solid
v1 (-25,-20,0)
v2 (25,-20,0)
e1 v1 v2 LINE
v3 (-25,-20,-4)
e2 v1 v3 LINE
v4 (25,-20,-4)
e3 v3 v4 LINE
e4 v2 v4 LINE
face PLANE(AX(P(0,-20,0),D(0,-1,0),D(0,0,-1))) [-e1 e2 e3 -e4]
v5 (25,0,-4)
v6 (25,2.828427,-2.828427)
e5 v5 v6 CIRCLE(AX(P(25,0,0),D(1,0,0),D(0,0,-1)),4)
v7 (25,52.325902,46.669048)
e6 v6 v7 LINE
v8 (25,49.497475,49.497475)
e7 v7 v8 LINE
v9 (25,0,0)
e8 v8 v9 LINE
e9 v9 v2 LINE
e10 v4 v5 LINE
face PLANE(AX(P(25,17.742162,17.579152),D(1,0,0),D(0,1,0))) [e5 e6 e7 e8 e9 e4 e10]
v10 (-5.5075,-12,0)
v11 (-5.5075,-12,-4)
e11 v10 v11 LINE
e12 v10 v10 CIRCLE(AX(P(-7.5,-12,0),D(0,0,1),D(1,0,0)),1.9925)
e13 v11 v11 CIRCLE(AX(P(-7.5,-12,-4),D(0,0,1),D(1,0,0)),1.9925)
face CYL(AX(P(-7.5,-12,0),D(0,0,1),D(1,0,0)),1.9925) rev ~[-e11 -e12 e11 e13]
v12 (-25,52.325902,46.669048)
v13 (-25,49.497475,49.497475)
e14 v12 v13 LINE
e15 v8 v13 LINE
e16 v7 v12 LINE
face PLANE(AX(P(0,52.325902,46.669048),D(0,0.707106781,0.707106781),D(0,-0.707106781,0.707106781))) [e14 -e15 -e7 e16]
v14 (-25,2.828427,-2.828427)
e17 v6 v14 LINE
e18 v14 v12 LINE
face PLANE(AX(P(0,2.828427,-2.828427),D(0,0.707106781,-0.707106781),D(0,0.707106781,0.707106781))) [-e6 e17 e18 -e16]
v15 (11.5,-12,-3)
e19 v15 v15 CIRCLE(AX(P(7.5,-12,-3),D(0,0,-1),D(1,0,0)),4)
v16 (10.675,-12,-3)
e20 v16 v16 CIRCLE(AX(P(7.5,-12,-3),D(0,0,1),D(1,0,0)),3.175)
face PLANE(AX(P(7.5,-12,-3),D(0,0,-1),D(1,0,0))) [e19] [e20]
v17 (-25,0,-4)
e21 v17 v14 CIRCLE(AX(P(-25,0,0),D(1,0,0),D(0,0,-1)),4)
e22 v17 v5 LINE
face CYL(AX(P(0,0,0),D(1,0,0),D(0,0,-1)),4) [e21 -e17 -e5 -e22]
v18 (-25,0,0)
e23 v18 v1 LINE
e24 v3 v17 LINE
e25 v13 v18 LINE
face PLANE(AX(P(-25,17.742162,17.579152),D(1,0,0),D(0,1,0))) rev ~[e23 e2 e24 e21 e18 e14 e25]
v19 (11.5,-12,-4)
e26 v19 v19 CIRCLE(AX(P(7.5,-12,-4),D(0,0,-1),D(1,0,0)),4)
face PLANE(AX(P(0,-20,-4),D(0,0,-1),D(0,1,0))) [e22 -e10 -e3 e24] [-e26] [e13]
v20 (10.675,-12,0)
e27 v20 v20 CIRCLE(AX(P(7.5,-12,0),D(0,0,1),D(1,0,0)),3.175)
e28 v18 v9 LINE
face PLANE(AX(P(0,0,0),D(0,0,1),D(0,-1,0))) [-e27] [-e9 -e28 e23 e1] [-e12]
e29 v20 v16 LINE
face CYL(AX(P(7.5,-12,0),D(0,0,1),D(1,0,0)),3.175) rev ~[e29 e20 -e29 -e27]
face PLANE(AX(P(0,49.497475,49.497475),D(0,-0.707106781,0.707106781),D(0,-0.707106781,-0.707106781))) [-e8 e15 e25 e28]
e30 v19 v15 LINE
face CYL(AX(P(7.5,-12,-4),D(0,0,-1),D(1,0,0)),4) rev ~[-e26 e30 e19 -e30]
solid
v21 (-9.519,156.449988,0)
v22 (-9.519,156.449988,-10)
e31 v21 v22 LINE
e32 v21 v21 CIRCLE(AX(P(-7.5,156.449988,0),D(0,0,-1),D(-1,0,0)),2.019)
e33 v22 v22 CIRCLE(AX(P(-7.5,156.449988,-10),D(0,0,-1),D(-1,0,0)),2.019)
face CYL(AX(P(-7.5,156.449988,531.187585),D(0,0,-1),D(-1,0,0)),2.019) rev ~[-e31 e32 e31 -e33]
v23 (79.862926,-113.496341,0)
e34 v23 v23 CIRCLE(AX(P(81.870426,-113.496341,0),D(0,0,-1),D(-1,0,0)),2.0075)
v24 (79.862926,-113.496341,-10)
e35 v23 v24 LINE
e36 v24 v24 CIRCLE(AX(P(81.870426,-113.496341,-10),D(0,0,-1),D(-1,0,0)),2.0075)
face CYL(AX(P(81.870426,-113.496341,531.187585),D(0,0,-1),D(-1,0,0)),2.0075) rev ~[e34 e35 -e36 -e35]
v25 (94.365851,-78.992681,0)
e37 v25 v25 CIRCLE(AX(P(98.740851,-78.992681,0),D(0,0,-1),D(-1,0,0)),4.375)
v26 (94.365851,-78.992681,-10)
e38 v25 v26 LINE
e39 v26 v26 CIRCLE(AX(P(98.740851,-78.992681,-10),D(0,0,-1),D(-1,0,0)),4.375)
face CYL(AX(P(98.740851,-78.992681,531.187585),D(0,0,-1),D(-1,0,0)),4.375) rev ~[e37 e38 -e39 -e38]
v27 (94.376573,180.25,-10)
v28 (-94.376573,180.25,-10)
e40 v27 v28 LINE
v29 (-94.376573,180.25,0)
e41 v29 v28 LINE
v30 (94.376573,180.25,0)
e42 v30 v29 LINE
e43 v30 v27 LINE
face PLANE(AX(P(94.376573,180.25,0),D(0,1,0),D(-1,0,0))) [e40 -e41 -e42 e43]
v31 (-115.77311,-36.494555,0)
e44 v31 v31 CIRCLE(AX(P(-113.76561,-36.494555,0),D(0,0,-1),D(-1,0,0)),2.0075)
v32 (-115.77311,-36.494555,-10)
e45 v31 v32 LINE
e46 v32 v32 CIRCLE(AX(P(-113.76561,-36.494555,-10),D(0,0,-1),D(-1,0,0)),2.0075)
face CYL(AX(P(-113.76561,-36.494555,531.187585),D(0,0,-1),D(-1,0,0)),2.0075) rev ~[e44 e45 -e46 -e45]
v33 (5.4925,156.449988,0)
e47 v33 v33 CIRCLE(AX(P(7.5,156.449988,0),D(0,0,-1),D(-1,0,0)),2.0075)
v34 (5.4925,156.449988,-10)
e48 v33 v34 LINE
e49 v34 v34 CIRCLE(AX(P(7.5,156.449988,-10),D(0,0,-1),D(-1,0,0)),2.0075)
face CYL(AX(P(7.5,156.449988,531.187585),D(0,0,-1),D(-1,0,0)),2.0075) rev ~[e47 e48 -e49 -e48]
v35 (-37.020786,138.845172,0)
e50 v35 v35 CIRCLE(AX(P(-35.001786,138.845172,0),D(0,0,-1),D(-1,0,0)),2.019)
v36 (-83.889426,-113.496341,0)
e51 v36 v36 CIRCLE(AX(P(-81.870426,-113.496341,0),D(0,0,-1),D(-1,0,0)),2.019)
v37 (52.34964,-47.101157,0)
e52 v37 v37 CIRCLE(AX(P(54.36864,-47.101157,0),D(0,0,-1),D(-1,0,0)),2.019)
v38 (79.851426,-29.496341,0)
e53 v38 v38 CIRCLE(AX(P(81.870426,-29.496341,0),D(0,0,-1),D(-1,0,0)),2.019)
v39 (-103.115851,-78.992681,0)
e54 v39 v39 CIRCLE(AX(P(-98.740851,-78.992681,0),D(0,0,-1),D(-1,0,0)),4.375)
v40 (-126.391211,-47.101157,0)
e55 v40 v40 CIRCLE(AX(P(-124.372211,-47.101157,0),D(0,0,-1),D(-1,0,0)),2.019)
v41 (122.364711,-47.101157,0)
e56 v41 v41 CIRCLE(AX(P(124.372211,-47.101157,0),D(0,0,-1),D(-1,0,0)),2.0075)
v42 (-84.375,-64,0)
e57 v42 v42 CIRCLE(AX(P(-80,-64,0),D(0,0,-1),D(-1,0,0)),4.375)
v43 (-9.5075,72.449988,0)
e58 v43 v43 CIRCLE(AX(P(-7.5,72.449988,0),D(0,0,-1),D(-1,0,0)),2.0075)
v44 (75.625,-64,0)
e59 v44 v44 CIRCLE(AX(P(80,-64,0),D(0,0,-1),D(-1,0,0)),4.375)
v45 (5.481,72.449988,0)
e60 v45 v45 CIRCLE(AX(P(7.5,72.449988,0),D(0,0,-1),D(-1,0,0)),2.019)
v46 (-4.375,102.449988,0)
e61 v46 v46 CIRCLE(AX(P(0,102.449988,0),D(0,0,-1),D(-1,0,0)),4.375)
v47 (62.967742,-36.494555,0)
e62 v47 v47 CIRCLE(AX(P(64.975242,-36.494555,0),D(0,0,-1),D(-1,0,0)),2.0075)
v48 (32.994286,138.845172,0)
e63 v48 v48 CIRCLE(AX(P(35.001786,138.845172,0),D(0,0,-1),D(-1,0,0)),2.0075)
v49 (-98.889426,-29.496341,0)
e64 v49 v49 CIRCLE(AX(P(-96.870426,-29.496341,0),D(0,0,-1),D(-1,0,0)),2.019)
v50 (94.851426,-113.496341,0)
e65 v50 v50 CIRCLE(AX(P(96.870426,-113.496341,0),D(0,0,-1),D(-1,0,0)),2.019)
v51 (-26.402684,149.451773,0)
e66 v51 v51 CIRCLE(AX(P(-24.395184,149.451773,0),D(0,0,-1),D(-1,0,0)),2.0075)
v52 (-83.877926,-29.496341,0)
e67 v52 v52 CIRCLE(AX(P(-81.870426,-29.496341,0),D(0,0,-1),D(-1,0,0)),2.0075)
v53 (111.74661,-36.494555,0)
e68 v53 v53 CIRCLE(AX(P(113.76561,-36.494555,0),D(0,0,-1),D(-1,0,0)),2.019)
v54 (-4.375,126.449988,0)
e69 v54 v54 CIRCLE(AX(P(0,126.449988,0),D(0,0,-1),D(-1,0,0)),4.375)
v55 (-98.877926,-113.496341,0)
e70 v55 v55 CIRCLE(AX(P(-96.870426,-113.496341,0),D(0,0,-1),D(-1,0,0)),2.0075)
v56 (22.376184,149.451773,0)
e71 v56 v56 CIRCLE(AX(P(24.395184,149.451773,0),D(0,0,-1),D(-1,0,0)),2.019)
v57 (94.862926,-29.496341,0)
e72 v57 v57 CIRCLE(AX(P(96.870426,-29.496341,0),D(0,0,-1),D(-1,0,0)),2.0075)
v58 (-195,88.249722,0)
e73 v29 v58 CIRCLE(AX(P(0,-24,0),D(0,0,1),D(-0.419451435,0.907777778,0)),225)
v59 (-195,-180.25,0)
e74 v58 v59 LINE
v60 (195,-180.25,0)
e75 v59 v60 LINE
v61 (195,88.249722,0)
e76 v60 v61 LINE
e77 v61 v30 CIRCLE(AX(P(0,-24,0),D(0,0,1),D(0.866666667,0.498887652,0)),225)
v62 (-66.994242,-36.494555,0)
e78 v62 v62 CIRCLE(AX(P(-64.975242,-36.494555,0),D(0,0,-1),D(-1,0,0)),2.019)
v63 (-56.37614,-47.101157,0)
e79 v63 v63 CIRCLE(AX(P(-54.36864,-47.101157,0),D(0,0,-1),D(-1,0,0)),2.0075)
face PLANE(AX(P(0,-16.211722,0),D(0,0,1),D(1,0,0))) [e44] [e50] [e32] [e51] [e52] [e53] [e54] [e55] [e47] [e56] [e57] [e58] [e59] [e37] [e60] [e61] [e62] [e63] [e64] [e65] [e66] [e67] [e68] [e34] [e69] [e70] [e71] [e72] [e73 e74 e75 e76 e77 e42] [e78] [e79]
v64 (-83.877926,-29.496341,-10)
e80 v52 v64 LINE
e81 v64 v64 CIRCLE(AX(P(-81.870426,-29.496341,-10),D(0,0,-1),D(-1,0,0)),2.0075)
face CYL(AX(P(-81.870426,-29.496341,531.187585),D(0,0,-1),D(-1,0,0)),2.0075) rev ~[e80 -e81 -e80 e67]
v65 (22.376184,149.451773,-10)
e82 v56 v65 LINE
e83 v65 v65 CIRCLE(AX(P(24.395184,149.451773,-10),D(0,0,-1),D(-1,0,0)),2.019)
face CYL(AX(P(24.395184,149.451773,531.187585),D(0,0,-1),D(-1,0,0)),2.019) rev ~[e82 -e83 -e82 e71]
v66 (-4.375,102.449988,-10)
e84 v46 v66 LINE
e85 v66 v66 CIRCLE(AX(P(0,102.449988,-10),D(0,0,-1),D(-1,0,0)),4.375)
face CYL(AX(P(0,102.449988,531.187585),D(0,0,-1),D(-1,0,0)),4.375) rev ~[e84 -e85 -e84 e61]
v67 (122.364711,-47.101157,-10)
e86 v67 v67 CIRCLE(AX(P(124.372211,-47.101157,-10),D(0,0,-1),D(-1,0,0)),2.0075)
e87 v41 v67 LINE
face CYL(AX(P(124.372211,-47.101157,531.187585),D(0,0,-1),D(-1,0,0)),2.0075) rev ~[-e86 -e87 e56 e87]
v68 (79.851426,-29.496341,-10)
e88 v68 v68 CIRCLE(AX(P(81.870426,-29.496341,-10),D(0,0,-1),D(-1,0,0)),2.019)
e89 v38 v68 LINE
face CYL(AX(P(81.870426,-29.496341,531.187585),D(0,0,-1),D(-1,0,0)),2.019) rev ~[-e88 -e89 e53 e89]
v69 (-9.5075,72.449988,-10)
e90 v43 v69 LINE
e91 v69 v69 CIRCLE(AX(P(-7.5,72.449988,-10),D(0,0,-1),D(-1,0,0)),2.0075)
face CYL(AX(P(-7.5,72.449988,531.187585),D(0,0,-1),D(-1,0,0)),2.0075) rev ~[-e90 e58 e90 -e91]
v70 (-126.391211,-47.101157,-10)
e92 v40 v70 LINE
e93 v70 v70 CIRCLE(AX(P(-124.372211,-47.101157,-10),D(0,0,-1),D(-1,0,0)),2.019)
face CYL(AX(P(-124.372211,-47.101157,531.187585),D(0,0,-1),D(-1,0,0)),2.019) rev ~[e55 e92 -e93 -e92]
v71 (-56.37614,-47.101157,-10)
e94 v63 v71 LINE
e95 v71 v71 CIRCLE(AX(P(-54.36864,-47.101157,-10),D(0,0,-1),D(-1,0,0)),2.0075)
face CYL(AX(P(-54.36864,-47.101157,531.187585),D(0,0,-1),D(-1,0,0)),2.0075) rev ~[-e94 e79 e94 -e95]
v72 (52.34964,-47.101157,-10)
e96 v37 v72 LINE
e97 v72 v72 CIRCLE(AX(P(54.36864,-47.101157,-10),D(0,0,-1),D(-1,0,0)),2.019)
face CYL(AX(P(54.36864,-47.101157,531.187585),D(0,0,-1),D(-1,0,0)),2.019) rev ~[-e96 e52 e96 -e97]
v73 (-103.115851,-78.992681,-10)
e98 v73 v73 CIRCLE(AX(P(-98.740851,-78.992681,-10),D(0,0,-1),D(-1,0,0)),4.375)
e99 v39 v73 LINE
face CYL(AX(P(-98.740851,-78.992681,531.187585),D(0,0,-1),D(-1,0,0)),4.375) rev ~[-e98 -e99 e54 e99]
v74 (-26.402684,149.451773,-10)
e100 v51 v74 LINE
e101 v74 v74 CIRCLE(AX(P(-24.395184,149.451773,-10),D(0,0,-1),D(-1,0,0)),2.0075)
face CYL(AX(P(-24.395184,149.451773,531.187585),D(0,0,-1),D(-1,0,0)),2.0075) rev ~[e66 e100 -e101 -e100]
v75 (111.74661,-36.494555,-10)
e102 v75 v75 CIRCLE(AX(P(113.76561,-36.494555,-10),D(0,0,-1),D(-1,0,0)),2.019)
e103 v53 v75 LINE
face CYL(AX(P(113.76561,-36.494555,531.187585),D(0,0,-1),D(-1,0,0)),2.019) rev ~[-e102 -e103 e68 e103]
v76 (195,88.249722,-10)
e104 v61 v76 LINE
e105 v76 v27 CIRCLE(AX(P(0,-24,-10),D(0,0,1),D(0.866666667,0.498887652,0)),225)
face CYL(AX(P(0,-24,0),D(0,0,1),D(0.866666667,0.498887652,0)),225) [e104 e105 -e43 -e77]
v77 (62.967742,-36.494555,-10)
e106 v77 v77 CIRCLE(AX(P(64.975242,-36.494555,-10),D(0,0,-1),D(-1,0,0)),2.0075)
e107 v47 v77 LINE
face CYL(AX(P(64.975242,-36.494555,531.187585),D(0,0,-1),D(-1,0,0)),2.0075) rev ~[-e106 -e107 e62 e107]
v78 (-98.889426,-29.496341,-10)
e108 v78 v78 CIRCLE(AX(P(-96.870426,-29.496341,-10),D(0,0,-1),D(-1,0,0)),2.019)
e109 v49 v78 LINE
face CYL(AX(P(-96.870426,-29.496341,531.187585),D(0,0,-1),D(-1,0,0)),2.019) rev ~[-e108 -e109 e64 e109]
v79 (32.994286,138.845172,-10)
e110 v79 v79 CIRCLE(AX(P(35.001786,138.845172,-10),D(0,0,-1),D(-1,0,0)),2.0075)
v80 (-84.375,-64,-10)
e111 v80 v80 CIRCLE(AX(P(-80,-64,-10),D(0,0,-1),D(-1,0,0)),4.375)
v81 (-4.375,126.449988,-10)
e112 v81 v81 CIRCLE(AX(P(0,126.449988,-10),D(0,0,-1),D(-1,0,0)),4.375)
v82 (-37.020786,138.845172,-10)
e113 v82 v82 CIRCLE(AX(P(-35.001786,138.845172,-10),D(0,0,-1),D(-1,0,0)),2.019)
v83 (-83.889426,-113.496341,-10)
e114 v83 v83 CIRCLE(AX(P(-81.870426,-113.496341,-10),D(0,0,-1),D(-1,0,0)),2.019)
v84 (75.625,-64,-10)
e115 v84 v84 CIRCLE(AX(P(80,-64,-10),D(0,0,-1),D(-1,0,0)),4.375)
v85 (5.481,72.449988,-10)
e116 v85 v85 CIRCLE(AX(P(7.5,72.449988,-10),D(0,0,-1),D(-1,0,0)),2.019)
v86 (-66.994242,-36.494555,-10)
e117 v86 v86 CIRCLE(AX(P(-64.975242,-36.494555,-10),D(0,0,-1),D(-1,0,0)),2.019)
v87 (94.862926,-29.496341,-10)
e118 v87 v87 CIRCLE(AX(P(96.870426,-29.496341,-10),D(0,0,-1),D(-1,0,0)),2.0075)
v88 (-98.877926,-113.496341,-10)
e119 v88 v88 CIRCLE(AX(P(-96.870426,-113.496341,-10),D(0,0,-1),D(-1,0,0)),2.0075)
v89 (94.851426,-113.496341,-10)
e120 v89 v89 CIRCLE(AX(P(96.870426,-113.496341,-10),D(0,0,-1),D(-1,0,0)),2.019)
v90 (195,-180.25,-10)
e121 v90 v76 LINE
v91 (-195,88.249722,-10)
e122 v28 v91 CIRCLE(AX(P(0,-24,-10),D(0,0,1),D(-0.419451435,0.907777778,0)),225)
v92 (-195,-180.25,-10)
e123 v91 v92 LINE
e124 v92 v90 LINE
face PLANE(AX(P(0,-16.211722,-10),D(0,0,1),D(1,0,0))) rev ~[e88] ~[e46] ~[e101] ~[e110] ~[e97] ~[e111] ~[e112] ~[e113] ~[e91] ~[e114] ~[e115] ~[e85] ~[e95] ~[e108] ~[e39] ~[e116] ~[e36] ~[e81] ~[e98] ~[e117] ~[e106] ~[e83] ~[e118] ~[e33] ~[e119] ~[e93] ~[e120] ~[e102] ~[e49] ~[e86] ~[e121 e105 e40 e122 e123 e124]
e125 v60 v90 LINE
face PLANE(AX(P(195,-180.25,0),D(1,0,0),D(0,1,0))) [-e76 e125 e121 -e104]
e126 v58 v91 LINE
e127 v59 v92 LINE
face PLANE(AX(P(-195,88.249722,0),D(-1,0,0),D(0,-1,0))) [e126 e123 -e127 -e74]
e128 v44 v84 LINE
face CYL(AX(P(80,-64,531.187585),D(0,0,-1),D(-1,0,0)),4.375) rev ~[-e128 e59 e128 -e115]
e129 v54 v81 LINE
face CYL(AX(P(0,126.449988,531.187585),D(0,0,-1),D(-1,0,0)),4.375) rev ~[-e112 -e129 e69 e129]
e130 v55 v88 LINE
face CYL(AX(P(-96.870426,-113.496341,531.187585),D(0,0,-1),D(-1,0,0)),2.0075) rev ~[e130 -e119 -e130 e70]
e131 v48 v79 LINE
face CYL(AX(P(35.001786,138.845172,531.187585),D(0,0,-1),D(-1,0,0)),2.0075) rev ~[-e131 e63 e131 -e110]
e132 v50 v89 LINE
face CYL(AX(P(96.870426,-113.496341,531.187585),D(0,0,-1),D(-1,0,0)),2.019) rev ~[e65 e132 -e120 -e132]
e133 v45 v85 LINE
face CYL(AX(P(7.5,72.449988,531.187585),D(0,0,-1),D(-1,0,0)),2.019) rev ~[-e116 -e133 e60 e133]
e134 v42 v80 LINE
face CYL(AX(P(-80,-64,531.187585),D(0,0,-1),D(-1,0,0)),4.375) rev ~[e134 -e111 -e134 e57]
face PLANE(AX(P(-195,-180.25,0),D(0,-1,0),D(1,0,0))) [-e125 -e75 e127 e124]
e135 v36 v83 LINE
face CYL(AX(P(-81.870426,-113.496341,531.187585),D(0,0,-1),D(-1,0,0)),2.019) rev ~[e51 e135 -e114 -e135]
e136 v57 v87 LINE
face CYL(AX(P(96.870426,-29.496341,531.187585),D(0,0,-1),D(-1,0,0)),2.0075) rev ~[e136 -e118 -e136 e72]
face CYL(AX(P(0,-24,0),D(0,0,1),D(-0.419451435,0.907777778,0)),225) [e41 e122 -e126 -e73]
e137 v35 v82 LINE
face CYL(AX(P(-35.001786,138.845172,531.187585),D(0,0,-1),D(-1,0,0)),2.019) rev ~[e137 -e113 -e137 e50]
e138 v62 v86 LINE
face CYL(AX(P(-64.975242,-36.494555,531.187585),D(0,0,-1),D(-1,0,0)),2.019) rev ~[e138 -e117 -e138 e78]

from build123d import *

# Parameters (mm, degrees)
F1_DEPTH  = 10
F2_D      = 8.75
F4_D      = 4.015
F5_D      = 4.038
F7_DEPTH  = 25
F8_R      = 1.9925
F8_R_2    = 3.175
F9_DEPTH  = 4
F10_R     = 4
F11_DEPTH = 1


with BuildPart() as f1:
    # F0 (on Top) → F1 (new body)
    with BuildSketch(Plane.XY):
        with BuildLine():
            Line((-195, -180.25), (195, -180.25))
            Line((195, -180.25), (195, 88.2497216032))
            ThreePointArc((195, 88.2497216032), (151.8246127367, 142.0550720916), (94.3765728346, 180.25))
            Line((94.3765728346, 180.25), (-94.3765728346, 180.25))
            ThreePointArc((-94.3765728346, 180.25), (-151.8246127367, 142.0550720916), (-195, 88.2497216032))
            Line((-195, 88.2497216032), (-195, -180.25))
        make_face()
    extrude(amount=-F1_DEPTH)

    # F2 (through all)
    with Locations(Plane.XY):
        with Locations((0, 126.4499877989), (0, 102.4499877989), (-80, -64), (-98.7408514266, -78.9926811413), (80, -64), (98.7408514266, -78.9926811413)):
            Hole(F2_D / 2)

    # F4 (through all)
    with Locations(Plane.XY):
        with Locations((-7.5, 72.4499877989), (81.8704257133, -113.4963405707), (-96.8704257133, -113.4963405707), (-113.7656096643, -36.4945549019), (-81.8704257133, -29.4963405707), (-54.3686400446, -47.1011566197), (64.9752417624, -36.4945549019), (96.8704257133, -29.4963405707), (124.3722113821, -47.1011566197), (-24.3951839509, 149.4517734677), (7.5, 156.4499877989), (35.0017856687, 138.8451717499)):
            Hole(F4_D / 2)

    # F5 (through all)
    with Locations(Plane.XY):
        with Locations((7.5, 72.4499877989), (24.3951839509, 149.4517734677), (-7.5, 156.4499877989), (-35.0017856687, 138.8451717499), (-81.8704257133, -113.4963405707), (-64.9752417624, -36.4945549019), (-96.8704257133, -29.4963405707), (-124.3722113821, -47.1011566197), (96.8704257133, -113.4963405707), (113.7656096643, -36.4945549019), (81.8704257133, -29.4963405707), (54.3686400446, -47.1011566197)):
            Hole(F5_D / 2)


with BuildPart() as f7:
    # F6 (on Right) → F7 (new body, symmetric)
    with BuildSketch(Plane.YZ):
        with BuildLine():
            Line((49.4974746831, 49.4974746831), (0, 0))
            Line((0, 0), (-20, 0))
            Line((-20, 0), (-20, -4))
            Line((-20, -4), (0, -4))
            ThreePointArc((0, -4), (1.5307337295, -3.69551813), (2.8284271247, -2.8284271247))
            Line((2.8284271247, -2.8284271247), (52.3259018078, 46.6690475583))
            Line((52.3259018078, 46.6690475583), (49.4974746831, 49.4974746831))
        make_face()
    extrude(amount=F7_DEPTH, both=True)

    # F8 (on face) → F9 (cut, through all)
    with BuildSketch(Plane.XY):
        with Locations((-7.5, -12)):
            Circle(F8_R)
        with Locations((7.5, -12)):
            Circle(F8_R_2)
    extrude(amount=-F9_DEPTH, mode=Mode.SUBTRACT)

    # F10 (on face) → F11 (cut)
    with BuildSketch(Plane(origin=(0, 0, -4), x_dir=(1, 0, 0), z_dir=(0, 0, -1))):
        with Locations((7.5, 12)):
            Circle(F10_R)
    extrude(amount=-F11_DEPTH, mode=Mode.SUBTRACT)


solid = Compound([f1.part, f7.part])
